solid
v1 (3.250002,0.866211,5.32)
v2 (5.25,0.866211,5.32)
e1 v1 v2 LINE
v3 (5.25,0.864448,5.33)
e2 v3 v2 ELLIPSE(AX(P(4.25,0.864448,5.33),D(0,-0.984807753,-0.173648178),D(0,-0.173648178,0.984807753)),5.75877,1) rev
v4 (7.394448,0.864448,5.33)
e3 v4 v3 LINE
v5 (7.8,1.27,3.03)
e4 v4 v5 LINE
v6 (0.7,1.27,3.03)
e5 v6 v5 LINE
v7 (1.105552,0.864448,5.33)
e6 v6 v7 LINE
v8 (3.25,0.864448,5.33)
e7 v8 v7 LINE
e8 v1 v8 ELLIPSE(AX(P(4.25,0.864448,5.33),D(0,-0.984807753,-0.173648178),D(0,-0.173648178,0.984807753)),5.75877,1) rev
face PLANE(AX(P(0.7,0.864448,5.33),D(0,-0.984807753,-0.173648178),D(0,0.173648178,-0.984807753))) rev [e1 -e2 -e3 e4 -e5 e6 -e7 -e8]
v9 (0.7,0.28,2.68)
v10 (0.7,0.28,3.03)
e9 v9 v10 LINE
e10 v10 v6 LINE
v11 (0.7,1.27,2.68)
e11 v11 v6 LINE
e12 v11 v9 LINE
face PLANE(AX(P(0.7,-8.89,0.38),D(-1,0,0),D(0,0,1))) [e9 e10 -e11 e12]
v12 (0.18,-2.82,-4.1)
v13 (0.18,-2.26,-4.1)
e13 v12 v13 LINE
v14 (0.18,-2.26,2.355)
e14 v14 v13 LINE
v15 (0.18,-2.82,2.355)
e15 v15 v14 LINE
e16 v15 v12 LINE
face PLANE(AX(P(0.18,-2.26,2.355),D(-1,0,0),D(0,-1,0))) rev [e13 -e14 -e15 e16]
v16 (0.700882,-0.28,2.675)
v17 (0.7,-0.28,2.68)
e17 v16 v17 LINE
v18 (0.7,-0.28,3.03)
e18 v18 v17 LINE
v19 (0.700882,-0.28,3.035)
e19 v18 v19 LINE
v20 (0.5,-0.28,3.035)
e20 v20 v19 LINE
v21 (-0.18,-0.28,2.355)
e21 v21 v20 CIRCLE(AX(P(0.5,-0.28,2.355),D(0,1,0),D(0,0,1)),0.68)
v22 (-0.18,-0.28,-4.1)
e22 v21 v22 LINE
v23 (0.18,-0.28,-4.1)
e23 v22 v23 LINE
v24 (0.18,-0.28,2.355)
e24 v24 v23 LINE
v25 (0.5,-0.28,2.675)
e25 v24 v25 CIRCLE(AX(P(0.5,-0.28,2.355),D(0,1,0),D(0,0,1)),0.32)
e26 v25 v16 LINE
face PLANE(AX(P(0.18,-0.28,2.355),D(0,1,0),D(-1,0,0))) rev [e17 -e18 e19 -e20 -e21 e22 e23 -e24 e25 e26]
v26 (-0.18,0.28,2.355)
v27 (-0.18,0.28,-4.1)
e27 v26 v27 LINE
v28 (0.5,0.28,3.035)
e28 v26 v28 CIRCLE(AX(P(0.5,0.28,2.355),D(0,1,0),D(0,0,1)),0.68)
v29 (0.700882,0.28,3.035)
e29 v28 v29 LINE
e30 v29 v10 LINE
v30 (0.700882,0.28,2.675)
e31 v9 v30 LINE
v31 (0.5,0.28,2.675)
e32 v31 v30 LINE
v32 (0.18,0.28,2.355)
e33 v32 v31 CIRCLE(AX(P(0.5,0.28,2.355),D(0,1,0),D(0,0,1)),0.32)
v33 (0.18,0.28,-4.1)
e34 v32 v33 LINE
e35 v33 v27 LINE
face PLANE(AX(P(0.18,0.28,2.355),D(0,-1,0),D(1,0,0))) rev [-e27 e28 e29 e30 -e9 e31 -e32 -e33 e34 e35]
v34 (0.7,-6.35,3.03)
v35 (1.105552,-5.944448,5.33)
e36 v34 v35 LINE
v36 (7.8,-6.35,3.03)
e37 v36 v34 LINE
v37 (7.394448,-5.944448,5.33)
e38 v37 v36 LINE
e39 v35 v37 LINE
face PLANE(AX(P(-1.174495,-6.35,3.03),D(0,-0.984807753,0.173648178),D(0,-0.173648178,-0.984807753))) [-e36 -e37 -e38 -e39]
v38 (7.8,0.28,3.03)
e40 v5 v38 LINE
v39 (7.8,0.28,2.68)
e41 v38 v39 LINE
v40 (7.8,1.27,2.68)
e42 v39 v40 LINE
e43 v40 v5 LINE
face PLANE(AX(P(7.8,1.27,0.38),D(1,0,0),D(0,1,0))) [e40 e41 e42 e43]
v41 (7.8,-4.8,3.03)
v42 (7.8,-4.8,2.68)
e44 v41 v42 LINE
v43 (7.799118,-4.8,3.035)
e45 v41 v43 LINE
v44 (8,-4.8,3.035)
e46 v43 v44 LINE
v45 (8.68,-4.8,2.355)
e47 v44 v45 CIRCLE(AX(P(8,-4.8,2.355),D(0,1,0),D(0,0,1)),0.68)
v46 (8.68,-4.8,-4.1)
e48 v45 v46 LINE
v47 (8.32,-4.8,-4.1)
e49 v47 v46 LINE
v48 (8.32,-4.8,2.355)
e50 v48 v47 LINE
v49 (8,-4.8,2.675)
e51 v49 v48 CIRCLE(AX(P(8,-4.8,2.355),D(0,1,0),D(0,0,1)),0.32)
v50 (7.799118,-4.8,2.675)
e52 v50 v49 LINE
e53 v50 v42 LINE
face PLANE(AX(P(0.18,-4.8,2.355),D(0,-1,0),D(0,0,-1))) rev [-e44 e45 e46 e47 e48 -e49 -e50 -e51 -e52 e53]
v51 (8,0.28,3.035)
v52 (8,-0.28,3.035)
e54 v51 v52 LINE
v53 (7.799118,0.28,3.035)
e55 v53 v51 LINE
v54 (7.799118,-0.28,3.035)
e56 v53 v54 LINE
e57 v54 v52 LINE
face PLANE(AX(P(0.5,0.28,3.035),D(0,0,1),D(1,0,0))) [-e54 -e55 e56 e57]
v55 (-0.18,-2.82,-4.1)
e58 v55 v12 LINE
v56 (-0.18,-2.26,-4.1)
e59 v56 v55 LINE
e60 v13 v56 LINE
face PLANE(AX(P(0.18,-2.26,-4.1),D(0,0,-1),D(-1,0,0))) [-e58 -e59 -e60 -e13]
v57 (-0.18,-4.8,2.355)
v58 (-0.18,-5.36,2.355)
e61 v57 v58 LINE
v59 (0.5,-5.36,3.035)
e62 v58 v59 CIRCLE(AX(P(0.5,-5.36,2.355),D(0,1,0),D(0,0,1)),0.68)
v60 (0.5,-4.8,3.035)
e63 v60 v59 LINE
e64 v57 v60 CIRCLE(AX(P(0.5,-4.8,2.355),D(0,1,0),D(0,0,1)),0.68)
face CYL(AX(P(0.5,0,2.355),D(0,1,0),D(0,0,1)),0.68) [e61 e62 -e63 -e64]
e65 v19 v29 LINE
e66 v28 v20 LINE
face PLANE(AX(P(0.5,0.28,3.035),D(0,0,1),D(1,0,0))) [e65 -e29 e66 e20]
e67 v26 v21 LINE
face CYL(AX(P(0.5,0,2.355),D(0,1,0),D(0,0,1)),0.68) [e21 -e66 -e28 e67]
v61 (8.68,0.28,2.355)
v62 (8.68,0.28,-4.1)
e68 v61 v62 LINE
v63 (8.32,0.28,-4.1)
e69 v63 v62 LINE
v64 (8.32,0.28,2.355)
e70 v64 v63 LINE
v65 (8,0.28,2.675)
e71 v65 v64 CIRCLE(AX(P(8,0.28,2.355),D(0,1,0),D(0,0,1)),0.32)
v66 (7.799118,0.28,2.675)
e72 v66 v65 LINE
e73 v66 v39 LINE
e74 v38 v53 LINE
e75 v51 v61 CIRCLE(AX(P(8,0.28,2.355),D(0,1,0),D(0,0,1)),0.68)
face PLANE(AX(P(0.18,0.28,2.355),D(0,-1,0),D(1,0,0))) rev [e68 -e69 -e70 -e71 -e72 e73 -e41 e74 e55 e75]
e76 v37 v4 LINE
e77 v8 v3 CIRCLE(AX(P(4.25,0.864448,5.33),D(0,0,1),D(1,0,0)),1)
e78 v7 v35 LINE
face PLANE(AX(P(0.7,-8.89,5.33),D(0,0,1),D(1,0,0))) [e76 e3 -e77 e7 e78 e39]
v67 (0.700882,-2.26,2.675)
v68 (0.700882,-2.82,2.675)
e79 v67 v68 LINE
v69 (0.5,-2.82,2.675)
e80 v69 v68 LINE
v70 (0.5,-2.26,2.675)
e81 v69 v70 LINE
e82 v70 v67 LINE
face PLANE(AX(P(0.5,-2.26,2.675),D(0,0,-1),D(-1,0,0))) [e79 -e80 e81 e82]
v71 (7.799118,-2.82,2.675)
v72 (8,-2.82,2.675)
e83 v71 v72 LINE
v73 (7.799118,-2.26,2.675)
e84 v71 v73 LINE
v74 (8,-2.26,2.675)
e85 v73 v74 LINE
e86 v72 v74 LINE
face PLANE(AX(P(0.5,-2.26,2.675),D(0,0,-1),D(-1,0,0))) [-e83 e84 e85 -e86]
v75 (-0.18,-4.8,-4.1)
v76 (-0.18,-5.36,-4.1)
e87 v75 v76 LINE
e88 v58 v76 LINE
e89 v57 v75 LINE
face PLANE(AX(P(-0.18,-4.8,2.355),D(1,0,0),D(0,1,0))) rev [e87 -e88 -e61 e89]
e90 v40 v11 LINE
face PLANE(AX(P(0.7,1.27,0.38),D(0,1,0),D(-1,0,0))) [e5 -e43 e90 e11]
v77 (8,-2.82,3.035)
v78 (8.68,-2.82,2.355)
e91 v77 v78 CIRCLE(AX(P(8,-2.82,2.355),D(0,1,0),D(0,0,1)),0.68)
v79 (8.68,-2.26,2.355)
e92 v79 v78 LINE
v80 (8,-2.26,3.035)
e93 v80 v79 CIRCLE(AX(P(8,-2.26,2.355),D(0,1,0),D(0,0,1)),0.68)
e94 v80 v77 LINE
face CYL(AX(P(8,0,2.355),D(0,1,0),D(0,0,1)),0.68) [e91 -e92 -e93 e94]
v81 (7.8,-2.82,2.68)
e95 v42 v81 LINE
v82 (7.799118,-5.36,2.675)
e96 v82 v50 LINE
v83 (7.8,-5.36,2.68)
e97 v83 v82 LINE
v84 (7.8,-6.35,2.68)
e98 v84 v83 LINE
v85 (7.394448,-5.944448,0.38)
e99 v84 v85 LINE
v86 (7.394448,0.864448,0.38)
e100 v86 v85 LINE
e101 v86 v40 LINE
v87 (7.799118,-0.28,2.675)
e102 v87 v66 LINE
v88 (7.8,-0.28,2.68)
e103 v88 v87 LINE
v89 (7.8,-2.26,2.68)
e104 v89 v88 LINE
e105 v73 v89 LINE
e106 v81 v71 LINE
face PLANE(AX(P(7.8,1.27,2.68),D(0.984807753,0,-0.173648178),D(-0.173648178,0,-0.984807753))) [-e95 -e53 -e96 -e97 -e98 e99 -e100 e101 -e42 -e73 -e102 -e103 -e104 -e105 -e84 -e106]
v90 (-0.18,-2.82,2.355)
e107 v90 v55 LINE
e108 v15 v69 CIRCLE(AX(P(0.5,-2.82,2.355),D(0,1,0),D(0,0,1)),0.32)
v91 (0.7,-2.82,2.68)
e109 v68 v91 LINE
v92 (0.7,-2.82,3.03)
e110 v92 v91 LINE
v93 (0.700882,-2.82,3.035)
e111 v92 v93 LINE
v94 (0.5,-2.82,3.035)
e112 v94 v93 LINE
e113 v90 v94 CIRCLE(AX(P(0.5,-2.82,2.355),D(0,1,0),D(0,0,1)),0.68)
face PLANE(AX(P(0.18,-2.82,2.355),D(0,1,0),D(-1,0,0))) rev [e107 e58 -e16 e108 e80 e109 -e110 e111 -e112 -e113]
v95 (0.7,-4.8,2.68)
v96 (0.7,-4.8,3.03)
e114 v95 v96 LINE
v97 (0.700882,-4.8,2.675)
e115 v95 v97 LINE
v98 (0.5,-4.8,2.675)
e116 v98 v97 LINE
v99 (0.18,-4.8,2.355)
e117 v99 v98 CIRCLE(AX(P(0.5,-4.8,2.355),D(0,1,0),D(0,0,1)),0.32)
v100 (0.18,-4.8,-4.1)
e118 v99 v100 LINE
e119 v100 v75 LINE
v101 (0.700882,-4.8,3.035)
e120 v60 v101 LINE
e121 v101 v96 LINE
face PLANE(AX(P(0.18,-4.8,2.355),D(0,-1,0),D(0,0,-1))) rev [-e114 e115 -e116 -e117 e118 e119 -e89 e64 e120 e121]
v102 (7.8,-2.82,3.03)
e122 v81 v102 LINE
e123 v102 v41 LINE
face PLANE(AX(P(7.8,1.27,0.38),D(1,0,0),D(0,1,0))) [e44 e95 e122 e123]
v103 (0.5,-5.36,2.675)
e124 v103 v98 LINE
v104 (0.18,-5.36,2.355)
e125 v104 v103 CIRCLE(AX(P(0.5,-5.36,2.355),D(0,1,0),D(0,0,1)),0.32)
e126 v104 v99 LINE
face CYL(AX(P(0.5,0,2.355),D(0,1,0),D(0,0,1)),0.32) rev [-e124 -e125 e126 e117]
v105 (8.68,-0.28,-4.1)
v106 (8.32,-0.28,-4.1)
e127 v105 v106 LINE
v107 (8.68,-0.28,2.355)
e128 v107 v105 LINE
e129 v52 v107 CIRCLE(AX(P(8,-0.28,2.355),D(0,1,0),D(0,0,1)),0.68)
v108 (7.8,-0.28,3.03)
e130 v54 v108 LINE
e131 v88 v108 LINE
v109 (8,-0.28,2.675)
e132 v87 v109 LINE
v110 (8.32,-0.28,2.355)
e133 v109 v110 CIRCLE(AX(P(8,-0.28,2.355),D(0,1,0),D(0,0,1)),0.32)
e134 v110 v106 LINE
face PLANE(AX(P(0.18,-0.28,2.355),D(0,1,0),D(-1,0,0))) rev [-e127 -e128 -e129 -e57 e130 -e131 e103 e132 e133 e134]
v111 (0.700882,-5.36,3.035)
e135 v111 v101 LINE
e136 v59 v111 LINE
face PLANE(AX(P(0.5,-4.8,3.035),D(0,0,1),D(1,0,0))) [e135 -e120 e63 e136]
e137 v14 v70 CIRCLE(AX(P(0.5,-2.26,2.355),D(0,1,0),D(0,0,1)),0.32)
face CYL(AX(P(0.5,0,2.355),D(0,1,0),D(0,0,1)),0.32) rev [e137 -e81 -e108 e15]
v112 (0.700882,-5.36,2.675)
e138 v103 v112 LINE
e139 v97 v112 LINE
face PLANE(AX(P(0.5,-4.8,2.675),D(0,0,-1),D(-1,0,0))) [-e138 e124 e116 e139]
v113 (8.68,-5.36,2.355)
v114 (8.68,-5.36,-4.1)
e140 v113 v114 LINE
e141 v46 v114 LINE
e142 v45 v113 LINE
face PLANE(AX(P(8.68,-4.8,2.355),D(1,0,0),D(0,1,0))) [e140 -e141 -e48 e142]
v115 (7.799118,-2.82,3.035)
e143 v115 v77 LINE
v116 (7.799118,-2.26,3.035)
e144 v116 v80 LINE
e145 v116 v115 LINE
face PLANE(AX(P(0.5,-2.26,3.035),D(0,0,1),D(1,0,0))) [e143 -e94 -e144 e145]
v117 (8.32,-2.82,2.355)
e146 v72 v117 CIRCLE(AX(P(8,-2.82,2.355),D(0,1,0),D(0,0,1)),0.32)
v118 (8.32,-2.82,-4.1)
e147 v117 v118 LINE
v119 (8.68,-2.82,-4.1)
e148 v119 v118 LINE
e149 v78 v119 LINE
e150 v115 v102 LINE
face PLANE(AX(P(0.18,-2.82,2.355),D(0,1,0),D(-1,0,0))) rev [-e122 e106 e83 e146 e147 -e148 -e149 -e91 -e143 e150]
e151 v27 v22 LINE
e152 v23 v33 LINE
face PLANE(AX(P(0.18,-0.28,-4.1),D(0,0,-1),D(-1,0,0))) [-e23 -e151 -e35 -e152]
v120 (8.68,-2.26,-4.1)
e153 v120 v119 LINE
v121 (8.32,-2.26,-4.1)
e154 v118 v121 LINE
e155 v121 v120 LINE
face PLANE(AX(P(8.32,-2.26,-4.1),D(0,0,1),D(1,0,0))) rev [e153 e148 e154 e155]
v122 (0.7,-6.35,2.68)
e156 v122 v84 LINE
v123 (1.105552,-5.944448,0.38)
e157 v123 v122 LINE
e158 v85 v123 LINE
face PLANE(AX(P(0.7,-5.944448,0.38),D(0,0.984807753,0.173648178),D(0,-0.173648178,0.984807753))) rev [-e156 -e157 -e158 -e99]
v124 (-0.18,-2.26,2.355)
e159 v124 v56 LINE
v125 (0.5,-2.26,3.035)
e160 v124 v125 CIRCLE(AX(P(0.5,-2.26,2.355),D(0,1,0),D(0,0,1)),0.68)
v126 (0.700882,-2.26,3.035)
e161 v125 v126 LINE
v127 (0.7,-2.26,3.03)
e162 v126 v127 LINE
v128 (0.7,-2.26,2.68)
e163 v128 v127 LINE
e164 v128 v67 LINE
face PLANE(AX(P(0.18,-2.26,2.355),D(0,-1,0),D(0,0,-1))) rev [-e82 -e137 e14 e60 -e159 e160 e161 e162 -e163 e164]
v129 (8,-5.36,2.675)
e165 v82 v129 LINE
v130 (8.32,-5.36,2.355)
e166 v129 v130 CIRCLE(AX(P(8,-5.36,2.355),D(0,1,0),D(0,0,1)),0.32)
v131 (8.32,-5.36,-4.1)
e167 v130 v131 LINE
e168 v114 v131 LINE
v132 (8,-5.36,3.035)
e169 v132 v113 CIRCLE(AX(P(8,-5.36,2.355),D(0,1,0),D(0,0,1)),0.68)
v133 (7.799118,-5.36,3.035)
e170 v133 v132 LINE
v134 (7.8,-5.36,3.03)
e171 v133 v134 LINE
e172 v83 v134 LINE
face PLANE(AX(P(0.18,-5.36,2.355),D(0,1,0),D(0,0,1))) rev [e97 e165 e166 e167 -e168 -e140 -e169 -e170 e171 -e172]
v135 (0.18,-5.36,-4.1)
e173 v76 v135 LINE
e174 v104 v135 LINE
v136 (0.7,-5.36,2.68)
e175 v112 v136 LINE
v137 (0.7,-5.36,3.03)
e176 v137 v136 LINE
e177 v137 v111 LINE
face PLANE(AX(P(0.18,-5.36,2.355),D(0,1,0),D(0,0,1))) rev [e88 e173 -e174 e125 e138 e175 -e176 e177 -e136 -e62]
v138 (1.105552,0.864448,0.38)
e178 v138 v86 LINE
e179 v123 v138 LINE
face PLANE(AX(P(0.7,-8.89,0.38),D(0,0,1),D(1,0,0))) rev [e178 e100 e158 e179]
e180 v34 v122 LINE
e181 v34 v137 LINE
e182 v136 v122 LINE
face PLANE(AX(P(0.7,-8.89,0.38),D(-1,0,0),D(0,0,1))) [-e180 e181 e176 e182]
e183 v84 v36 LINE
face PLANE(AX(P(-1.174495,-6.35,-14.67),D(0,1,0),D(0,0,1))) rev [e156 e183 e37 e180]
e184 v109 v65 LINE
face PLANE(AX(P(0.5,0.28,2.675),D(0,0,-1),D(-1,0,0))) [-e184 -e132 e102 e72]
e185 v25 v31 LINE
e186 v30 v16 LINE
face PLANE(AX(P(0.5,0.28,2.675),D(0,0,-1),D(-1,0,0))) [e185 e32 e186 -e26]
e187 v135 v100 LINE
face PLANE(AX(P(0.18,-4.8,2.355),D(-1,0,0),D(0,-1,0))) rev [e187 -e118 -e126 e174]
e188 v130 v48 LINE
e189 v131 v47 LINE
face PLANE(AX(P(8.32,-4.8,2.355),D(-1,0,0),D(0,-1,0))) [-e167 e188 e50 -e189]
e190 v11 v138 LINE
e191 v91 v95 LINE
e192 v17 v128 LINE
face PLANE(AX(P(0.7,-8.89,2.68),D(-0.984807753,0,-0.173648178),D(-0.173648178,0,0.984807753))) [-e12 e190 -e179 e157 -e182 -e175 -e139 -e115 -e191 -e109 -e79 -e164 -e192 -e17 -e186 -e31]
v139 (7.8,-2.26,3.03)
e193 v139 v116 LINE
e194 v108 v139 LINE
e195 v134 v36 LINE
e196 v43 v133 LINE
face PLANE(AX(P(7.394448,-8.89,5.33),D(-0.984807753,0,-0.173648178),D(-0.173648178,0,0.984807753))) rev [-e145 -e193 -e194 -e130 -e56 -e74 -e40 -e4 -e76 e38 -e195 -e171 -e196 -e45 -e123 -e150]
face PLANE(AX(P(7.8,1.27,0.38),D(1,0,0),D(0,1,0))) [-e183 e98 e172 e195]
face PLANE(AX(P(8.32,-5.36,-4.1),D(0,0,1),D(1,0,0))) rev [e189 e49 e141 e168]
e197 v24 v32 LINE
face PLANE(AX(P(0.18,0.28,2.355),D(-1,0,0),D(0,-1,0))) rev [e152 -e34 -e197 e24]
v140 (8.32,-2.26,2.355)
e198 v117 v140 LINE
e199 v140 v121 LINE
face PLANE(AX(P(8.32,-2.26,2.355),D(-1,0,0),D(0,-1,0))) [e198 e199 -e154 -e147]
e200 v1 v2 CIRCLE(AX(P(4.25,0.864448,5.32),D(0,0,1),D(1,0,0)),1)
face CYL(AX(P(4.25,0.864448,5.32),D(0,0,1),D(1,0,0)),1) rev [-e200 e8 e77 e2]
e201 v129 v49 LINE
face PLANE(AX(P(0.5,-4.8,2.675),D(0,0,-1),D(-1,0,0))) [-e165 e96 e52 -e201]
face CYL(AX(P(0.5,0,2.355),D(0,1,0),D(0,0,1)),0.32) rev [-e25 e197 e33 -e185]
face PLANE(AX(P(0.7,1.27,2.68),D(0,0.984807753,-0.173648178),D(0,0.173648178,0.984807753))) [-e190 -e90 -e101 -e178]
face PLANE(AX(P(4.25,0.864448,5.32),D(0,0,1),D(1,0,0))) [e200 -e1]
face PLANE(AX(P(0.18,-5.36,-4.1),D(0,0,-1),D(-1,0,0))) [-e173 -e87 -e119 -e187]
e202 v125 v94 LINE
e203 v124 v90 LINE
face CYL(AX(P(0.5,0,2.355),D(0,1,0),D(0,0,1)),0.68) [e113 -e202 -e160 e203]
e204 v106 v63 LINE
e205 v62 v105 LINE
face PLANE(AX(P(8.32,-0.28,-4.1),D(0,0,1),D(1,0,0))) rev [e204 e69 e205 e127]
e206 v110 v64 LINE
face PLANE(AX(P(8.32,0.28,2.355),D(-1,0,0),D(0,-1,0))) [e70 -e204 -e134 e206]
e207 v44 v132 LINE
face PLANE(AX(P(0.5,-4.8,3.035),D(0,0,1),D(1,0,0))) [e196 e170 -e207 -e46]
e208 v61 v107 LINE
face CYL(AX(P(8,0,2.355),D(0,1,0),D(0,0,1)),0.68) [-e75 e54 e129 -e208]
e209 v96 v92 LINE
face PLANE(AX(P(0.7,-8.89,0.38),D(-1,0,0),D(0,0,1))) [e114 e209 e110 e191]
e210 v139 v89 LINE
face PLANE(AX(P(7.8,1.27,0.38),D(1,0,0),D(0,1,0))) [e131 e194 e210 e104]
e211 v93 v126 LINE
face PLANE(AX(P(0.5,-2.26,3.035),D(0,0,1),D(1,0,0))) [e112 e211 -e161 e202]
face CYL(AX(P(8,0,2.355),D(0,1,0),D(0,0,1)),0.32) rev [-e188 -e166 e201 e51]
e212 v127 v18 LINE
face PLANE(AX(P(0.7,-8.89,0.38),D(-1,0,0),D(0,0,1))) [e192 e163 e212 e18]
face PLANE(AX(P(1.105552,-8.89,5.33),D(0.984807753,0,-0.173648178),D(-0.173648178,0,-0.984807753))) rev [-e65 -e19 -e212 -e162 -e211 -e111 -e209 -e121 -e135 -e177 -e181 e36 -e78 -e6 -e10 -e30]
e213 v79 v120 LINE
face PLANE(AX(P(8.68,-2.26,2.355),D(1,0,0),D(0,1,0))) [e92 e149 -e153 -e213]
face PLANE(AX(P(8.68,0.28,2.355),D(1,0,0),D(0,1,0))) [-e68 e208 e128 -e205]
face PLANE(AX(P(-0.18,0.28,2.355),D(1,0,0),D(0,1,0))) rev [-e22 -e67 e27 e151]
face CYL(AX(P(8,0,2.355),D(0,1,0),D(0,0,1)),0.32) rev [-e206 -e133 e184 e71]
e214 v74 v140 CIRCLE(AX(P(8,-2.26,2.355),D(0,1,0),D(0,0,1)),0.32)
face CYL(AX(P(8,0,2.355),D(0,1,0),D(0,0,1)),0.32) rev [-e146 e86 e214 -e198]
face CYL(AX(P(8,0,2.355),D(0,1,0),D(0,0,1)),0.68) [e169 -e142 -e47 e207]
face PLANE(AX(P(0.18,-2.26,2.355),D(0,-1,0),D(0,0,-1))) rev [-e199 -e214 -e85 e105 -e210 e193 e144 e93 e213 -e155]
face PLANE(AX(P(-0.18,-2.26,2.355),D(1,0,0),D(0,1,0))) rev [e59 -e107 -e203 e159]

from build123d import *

# Parameters (mm, degrees)
EXTRUDE_1_DEPTH     = 4.95
SKETCH_5_W          = 0.36
SKETCH_5_H          = 0.56
SKETCH_5_2_W        = 0.36
SKETCH_5_2_H        = 0.56
EXTRUDE_2_DEPTH     = 4.1
CHAMFER_1_SIZE      = 2.3
CHAMFER_1_SIZE_2    = 0.405552056
SKETCH_6_R          = 1
CUT_EXTRUDE_1_DEPTH = 0.01
SKETCH_7_W          = 10.556189846
SKETCH_7_H          = 3.652287582
CUT_EXTRUDE_2_DEPTH = 20
CHAMFER_2_SIZE      = 2.3
CHAMFER_2_SIZE2     = 0.405552056


with BuildPart() as part:
    # Эскиз3 → Вытянуть1 (new body)
    with BuildSketch(Plane.XY.offset(5.33)):
        Polygon((0.7, 1.27), (4.25, 1.27), (7.8, 1.27), (7.8, -8.89), (0.7, -8.89), align=None)
    extrude(amount=-EXTRUDE_1_DEPTH)

    # По траектории1: sweep along a path in Эскиз4
    with BuildLine(Plane(origin=(0, 0, 0), x_dir=(1, 0, 0), z_dir=(0, 1, 0))) as sweep_1_path:
        Line((0, 0), (0, -2.355))
        ThreePointArc((0, -2.355), (0.146446609, -2.708553391), (0.5, -2.855))
        Line((0.5, -2.855), (0.7, -2.855))
        Line((0.7, -2.855), (7.8, -2.855))
        Line((7.8, -2.855), (8, -2.855))
        ThreePointArc((8, -2.855), (8.353553391, -2.708553391), (8.5, -2.355))
        Line((8.5, -2.355), (8.5, 0))
        Line((8.5, 0), (8.5, 4.1))
    # Эскиз5 → По траектории1 (sweep)
    with BuildSketch(Plane.XY):
        with Locations((0, -2.54)):
            Rectangle(SKETCH_5_W, SKETCH_5_H)
        Rectangle(SKETCH_5_W, SKETCH_5_H)
        with Locations((0, -5.08)):
            Rectangle(SKETCH_5_W, SKETCH_5_H)
        with Locations((0, -7.62)):
            Rectangle(SKETCH_5_W, SKETCH_5_H)
    sweep(path=sweep_1_path.line)

    # Эскиз5<2> → Вытянуть2 (add)
    with BuildSketch(Plane.XY):
        with Locations((0, -2.54)):
            Rectangle(SKETCH_5_2_W, SKETCH_5_2_H)
        Rectangle(SKETCH_5_2_W, SKETCH_5_2_H)
        with Locations((0, -5.08)):
            Rectangle(SKETCH_5_2_W, SKETCH_5_2_H)
        with Locations((0, -7.62)):
            Rectangle(SKETCH_5_2_W, SKETCH_5_2_H)
    extrude(amount=-EXTRUDE_2_DEPTH)

    # Фаска1
    # the kernel refuses this chamfer: 2.3, 0.405552056 mm, written as the material it takes off along each edge
    with BuildSketch(Plane(origin=(13.776639232, -8.89, 0.38), x_dir=(0, -0.006682531656101655, 0.9999776716360548), z_dir=(-1, 0, 0))) as chamfer_1_piece_1:
        Polygon((CHAMFER_1_SIZE * 0.999977671636, CHAMFER_1_SIZE * 0.0066825316561), (-CHAMFER_1_SIZE_2 * 0.00668253165, CHAMFER_1_SIZE_2 * 0.999977670722), (0, 0), align=None)
    extrude(amount=19.053278464, mode=Mode.SUBTRACT)
    with BuildSketch(Plane(origin=(13.776639232, -8.89, 5.33), x_dir=(4.402885138150507e-15, 0.9776715712462588, 0.2101387607674306), z_dir=(-1, 0, 0))) as chamfer_1_piece_2:
        Polygon((CHAMFER_1_SIZE_2 * 0.977671570353, CHAMFER_1_SIZE_2 * 0.210138760575), (-CHAMFER_1_SIZE * 0.210138760767, CHAMFER_1_SIZE * 0.977671571246), (0, 0), align=None)
    extrude(amount=19.053278464, mode=Mode.SUBTRACT)
    with BuildSketch(Plane(origin=(7.8, 7.246639232, 0.38), x_dir=(0.006682531656101655, 0, 0.9999776716360548), z_dir=(0, -1, 0))) as chamfer_1_piece_3_section:
        Polygon((CHAMFER_1_SIZE * 0.999977671636, CHAMFER_1_SIZE * 0.0066825316561), (-CHAMFER_1_SIZE_2 * 0.00668253165, CHAMFER_1_SIZE_2 * 0.999977670722), (0, 0), align=None)
    chamfer_1_piece_3 = extrude(amount=22.113278464, mode=Mode.PRIVATE)
    chamfer_1_piece_3 = split(chamfer_1_piece_3, bisect_by=Plane(origin=(7.799706122, 0.28, 2.676666667), z_dir=(0, 1, 0)), keep=Keep.TOP, mode=Mode.PRIVATE)
    add(chamfer_1_piece_3, mode=Mode.SUBTRACT)
    with BuildSketch(Plane(origin=(7.8, 7.246639232, 0.38), x_dir=(0.006682531656101655, 0, 0.9999776716360548), z_dir=(0, -1, 0))) as chamfer_1_piece_4_section:
        Polygon((CHAMFER_1_SIZE * 0.999977671636, CHAMFER_1_SIZE * 0.0066825316561), (-CHAMFER_1_SIZE_2 * 0.00668253165, CHAMFER_1_SIZE_2 * 0.999977670722), (0, 0), align=None)
    chamfer_1_piece_4 = extrude(amount=22.113278464, mode=Mode.PRIVATE)
    chamfer_1_piece_4 = split(chamfer_1_piece_4, bisect_by=Plane(origin=(7.664815344, 0, 2.675), z_dir=(0, 0, -1)), keep=Keep.TOP, mode=Mode.PRIVATE)
    add(chamfer_1_piece_4, mode=Mode.SUBTRACT)
    with BuildSketch(Plane(origin=(7.8, 7.246639232, 0.38), x_dir=(0.006682531656101655, 0, 0.9999776716360548), z_dir=(0, -1, 0))) as chamfer_1_piece_5_section:
        Polygon((CHAMFER_1_SIZE * 0.999977671636, CHAMFER_1_SIZE * 0.0066825316561), (-CHAMFER_1_SIZE_2 * 0.00668253165, CHAMFER_1_SIZE_2 * 0.999977670722), (0, 0), align=None)
    chamfer_1_piece_5 = extrude(amount=22.113278464, mode=Mode.PRIVATE)
    chamfer_1_piece_5 = split(chamfer_1_piece_5, bisect_by=Plane(origin=(7.799706122, -2.26, 2.676666667), z_dir=(0, 1, 0)), keep=Keep.TOP, mode=Mode.PRIVATE)
    chamfer_1_piece_5 = split(chamfer_1_piece_5, bisect_by=Plane(origin=(7.799706122, -0.28, 2.676666667), z_dir=(0, -1, 0)), keep=Keep.TOP, mode=Mode.PRIVATE)
    add(chamfer_1_piece_5, mode=Mode.SUBTRACT)
    with BuildSketch(Plane(origin=(7.8, 7.246639232, 0.38), x_dir=(0.006682531656101655, 0, 0.9999776716360548), z_dir=(0, -1, 0))) as chamfer_1_piece_6_section:
        Polygon((CHAMFER_1_SIZE * 0.999977671636, CHAMFER_1_SIZE * 0.0066825316561), (-CHAMFER_1_SIZE_2 * 0.00668253165, CHAMFER_1_SIZE_2 * 0.999977670722), (0, 0), align=None)
    chamfer_1_piece_6 = extrude(amount=22.113278464, mode=Mode.PRIVATE)
    chamfer_1_piece_6 = split(chamfer_1_piece_6, bisect_by=Plane(origin=(7.799706122, -2.82, 2.676666667), z_dir=(0, -1, 0)), keep=Keep.TOP, mode=Mode.PRIVATE)
    chamfer_1_piece_6 = split(chamfer_1_piece_6, bisect_by=Plane(origin=(7.799706122, -4.8, 2.676666667), z_dir=(0, 1, 0)), keep=Keep.TOP, mode=Mode.PRIVATE)
    add(chamfer_1_piece_6, mode=Mode.SUBTRACT)
    with BuildSketch(Plane(origin=(7.8, 7.246639232, 0.38), x_dir=(0.006682531656101655, 0, 0.9999776716360548), z_dir=(0, -1, 0))) as chamfer_1_piece_7_section:
        Polygon((CHAMFER_1_SIZE * 0.999977671636, CHAMFER_1_SIZE * 0.0066825316561), (-CHAMFER_1_SIZE_2 * 0.00668253165, CHAMFER_1_SIZE_2 * 0.999977670722), (0, 0), align=None)
    chamfer_1_piece_7 = extrude(amount=22.113278464, mode=Mode.PRIVATE)
    chamfer_1_piece_7 = split(chamfer_1_piece_7, bisect_by=Plane(origin=(7.799706122, -7.34, 2.676666667), z_dir=(0, 1, 0)), keep=Keep.TOP, mode=Mode.PRIVATE)
    chamfer_1_piece_7 = split(chamfer_1_piece_7, bisect_by=Plane(origin=(7.799706122, -5.36, 2.676666667), z_dir=(0, -1, 0)), keep=Keep.TOP, mode=Mode.PRIVATE)
    add(chamfer_1_piece_7, mode=Mode.SUBTRACT)
    with BuildSketch(Plane(origin=(7.8, 7.246639232, 0.38), x_dir=(0.006682531656101655, 0, 0.9999776716360548), z_dir=(0, -1, 0))) as chamfer_1_piece_8_section:
        Polygon((CHAMFER_1_SIZE * 0.999977671636, CHAMFER_1_SIZE * 0.0066825316561), (-CHAMFER_1_SIZE_2 * 0.00668253165, CHAMFER_1_SIZE_2 * 0.999977670722), (0, 0), align=None)
    chamfer_1_piece_8 = extrude(amount=22.113278464, mode=Mode.PRIVATE)
    chamfer_1_piece_8 = split(chamfer_1_piece_8, bisect_by=Plane(origin=(7.799706122, -7.9, 2.676666667), z_dir=(0, -1, 0)), keep=Keep.TOP, mode=Mode.PRIVATE)
    add(chamfer_1_piece_8, mode=Mode.SUBTRACT)
    with BuildSketch(Plane(origin=(7.8, 7.246639232, 5.33), x_dir=(-0.9776715712462587, -1.3674752616302956e-15, 0.21013876076743102), z_dir=(0, -1, 0))) as chamfer_1_piece_9_section:
        Polygon((CHAMFER_1_SIZE_2 * 0.977671570353, CHAMFER_1_SIZE_2 * 0.210138760575), (-CHAMFER_1_SIZE * 0.210138760767, CHAMFER_1_SIZE * 0.977671571246), (0, 0), align=None)
    chamfer_1_piece_9 = extrude(amount=22.113278464, mode=Mode.PRIVATE)
    chamfer_1_piece_9 = split(chamfer_1_piece_9, bisect_by=Plane(origin=(7.664815344, 0.775, 3.035), z_dir=(0, 0, 1)), keep=Keep.TOP, mode=Mode.PRIVATE)
    add(chamfer_1_piece_9, mode=Mode.SUBTRACT)
    with BuildSketch(Plane(origin=(7.8, 7.246639232, 5.33), x_dir=(-0.9776715712462587, -1.3674752616302956e-15, 0.21013876076743102), z_dir=(0, -1, 0))) as chamfer_1_piece_10_section:
        Polygon((CHAMFER_1_SIZE_2 * 0.977671570353, CHAMFER_1_SIZE_2 * 0.210138760575), (-CHAMFER_1_SIZE * 0.210138760767, CHAMFER_1_SIZE * 0.977671571246), (0, 0), align=None)
    chamfer_1_piece_10 = extrude(amount=22.113278464, mode=Mode.PRIVATE)
    chamfer_1_piece_10 = split(chamfer_1_piece_10, bisect_by=Plane(origin=(7.799706122, 0.28, 3.033333333), z_dir=(0, 1, 0)), keep=Keep.TOP, mode=Mode.PRIVATE)
    add(chamfer_1_piece_10, mode=Mode.SUBTRACT)
    with BuildSketch(Plane(origin=(7.8, 7.246639232, 5.33), x_dir=(-0.9776715712462587, -1.3674752616302956e-15, 0.21013876076743102), z_dir=(0, -1, 0))) as chamfer_1_piece_11_section:
        Polygon((CHAMFER_1_SIZE_2 * 0.977671570353, CHAMFER_1_SIZE_2 * 0.210138760575), (-CHAMFER_1_SIZE * 0.210138760767, CHAMFER_1_SIZE * 0.977671571246), (0, 0), align=None)
    chamfer_1_piece_11 = extrude(amount=22.113278464, mode=Mode.PRIVATE)
    chamfer_1_piece_11 = split(chamfer_1_piece_11, bisect_by=Plane(origin=(7.799706122, -2.26, 3.033333333), z_dir=(0, 1, 0)), keep=Keep.TOP, mode=Mode.PRIVATE)
    chamfer_1_piece_11 = split(chamfer_1_piece_11, bisect_by=Plane(origin=(7.799706122, -0.28, 3.033333333), z_dir=(0, -1, 0)), keep=Keep.TOP, mode=Mode.PRIVATE)
    add(chamfer_1_piece_11, mode=Mode.SUBTRACT)
    with BuildSketch(Plane(origin=(7.8, 7.246639232, 5.33), x_dir=(-0.9776715712462587, -1.3674752616302956e-15, 0.21013876076743102), z_dir=(0, -1, 0))) as chamfer_1_piece_12_section:
        Polygon((CHAMFER_1_SIZE_2 * 0.977671570353, CHAMFER_1_SIZE_2 * 0.210138760575), (-CHAMFER_1_SIZE * 0.210138760767, CHAMFER_1_SIZE * 0.977671571246), (0, 0), align=None)
    chamfer_1_piece_12 = extrude(amount=22.113278464, mode=Mode.PRIVATE)
    chamfer_1_piece_12 = split(chamfer_1_piece_12, bisect_by=Plane(origin=(7.799706122, -2.82, 3.033333333), z_dir=(0, -1, 0)), keep=Keep.TOP, mode=Mode.PRIVATE)
    chamfer_1_piece_12 = split(chamfer_1_piece_12, bisect_by=Plane(origin=(7.799706122, -4.8, 3.033333333), z_dir=(0, 1, 0)), keep=Keep.TOP, mode=Mode.PRIVATE)
    add(chamfer_1_piece_12, mode=Mode.SUBTRACT)
    with BuildSketch(Plane(origin=(7.8, 7.246639232, 5.33), x_dir=(-0.9776715712462587, -1.3674752616302956e-15, 0.21013876076743102), z_dir=(0, -1, 0))) as chamfer_1_piece_13_section:
        Polygon((CHAMFER_1_SIZE_2 * 0.977671570353, CHAMFER_1_SIZE_2 * 0.210138760575), (-CHAMFER_1_SIZE * 0.210138760767, CHAMFER_1_SIZE * 0.977671571246), (0, 0), align=None)
    chamfer_1_piece_13 = extrude(amount=22.113278464, mode=Mode.PRIVATE)
    chamfer_1_piece_13 = split(chamfer_1_piece_13, bisect_by=Plane(origin=(7.799706122, -7.34, 3.033333333), z_dir=(0, 1, 0)), keep=Keep.TOP, mode=Mode.PRIVATE)
    chamfer_1_piece_13 = split(chamfer_1_piece_13, bisect_by=Plane(origin=(7.799706122, -5.36, 3.033333333), z_dir=(0, -1, 0)), keep=Keep.TOP, mode=Mode.PRIVATE)
    add(chamfer_1_piece_13, mode=Mode.SUBTRACT)
    with BuildSketch(Plane(origin=(7.8, 7.246639232, 5.33), x_dir=(-0.9776715712462587, -1.3674752616302956e-15, 0.21013876076743102), z_dir=(0, -1, 0))) as chamfer_1_piece_14_section:
        Polygon((CHAMFER_1_SIZE_2 * 0.977671570353, CHAMFER_1_SIZE_2 * 0.210138760575), (-CHAMFER_1_SIZE * 0.210138760767, CHAMFER_1_SIZE * 0.977671571246), (0, 0), align=None)
    chamfer_1_piece_14 = extrude(amount=22.113278464, mode=Mode.PRIVATE)
    chamfer_1_piece_14 = split(chamfer_1_piece_14, bisect_by=Plane(origin=(7.799706122, -7.9, 3.033333333), z_dir=(0, -1, 0)), keep=Keep.TOP, mode=Mode.PRIVATE)
    add(chamfer_1_piece_14, mode=Mode.SUBTRACT)
    with BuildSketch(Plane(origin=(13.776639232, 1.27, 0.38), x_dir=(0, 0.006682531656101748, 0.9999776716360548), z_dir=(-1, 0, 0)), Plane(origin=(-5.276639232, 1.27, 5.33), x_dir=(0, 0.006682531656101748, -0.9999776716360548), z_dir=(1, 0, 0))) as chamfer_1_piece_15:
        Polygon((CHAMFER_1_SIZE * 0.999977671636, -CHAMFER_1_SIZE * 0.0066825316561), (-CHAMFER_1_SIZE_2 * 0.00668253165, -CHAMFER_1_SIZE_2 * 0.999977670722), (0, 0), align=None)
    extrude(amount=19.053278464, mode=Mode.SUBTRACT)
    with BuildSketch(Plane(origin=(0.7, -14.866639232, 0.38), x_dir=(0.9776715712462587, 0, -0.2101387607674313), z_dir=(0, 1, 0))) as chamfer_1_piece_16_section:
        Polygon((CHAMFER_1_SIZE_2 * 0.977671570353, -CHAMFER_1_SIZE_2 * 0.210138760575), (-CHAMFER_1_SIZE * 0.210138760767, -CHAMFER_1_SIZE * 0.977671571246), (0, 0), align=None)
    chamfer_1_piece_16 = extrude(amount=22.113278464, mode=Mode.PRIVATE)
    chamfer_1_piece_16 = split(chamfer_1_piece_16, bisect_by=Plane(origin=(0.835184656, -8.395, 2.675), z_dir=(0, 0, -1)), keep=Keep.TOP, mode=Mode.PRIVATE)
    add(chamfer_1_piece_16, mode=Mode.SUBTRACT)
    with BuildSketch(Plane(origin=(0.7, -14.866639232, 0.38), x_dir=(0.9776715712462587, 0, -0.2101387607674313), z_dir=(0, 1, 0))) as chamfer_1_piece_17_section:
        Polygon((CHAMFER_1_SIZE_2 * 0.977671570353, -CHAMFER_1_SIZE_2 * 0.210138760575), (-CHAMFER_1_SIZE * 0.210138760767, -CHAMFER_1_SIZE * 0.977671571246), (0, 0), align=None)
    chamfer_1_piece_17 = extrude(amount=22.113278464, mode=Mode.PRIVATE)
    chamfer_1_piece_17 = split(chamfer_1_piece_17, bisect_by=Plane(origin=(0.700293878, -7.9, 2.676666667), z_dir=(0, -1, 0)), keep=Keep.TOP, mode=Mode.PRIVATE)
    add(chamfer_1_piece_17, mode=Mode.SUBTRACT)
    with BuildSketch(Plane(origin=(0.7, -14.866639232, 0.38), x_dir=(0.9776715712462587, 0, -0.2101387607674313), z_dir=(0, 1, 0))) as chamfer_1_piece_18_section:
        Polygon((CHAMFER_1_SIZE_2 * 0.977671570353, -CHAMFER_1_SIZE_2 * 0.210138760575), (-CHAMFER_1_SIZE * 0.210138760767, -CHAMFER_1_SIZE * 0.977671571246), (0, 0), align=None)
    chamfer_1_piece_18 = extrude(amount=22.113278464, mode=Mode.PRIVATE)
    chamfer_1_piece_18 = split(chamfer_1_piece_18, bisect_by=Plane(origin=(0.700293878, -5.36, 2.676666667), z_dir=(0, -1, 0)), keep=Keep.TOP, mode=Mode.PRIVATE)
    chamfer_1_piece_18 = split(chamfer_1_piece_18, bisect_by=Plane(origin=(0.700293878, -7.34, 2.676666667), z_dir=(0, 1, 0)), keep=Keep.TOP, mode=Mode.PRIVATE)
    add(chamfer_1_piece_18, mode=Mode.SUBTRACT)
    with BuildSketch(Plane(origin=(0.7, -14.866639232, 0.38), x_dir=(0.9776715712462587, 0, -0.2101387607674313), z_dir=(0, 1, 0))) as chamfer_1_piece_19_section:
        Polygon((CHAMFER_1_SIZE_2 * 0.977671570353, -CHAMFER_1_SIZE_2 * 0.210138760575), (-CHAMFER_1_SIZE * 0.210138760767, -CHAMFER_1_SIZE * 0.977671571246), (0, 0), align=None)
    chamfer_1_piece_19 = extrude(amount=22.113278464, mode=Mode.PRIVATE)
    chamfer_1_piece_19 = split(chamfer_1_piece_19, bisect_by=Plane(origin=(0.700293878, -2.82, 2.676666667), z_dir=(0, -1, 0)), keep=Keep.TOP, mode=Mode.PRIVATE)
    chamfer_1_piece_19 = split(chamfer_1_piece_19, bisect_by=Plane(origin=(0.700293878, -4.8, 2.676666667), z_dir=(0, 1, 0)), keep=Keep.TOP, mode=Mode.PRIVATE)
    add(chamfer_1_piece_19, mode=Mode.SUBTRACT)
    with BuildSketch(Plane(origin=(0.7, -14.866639232, 0.38), x_dir=(0.9776715712462587, 0, -0.2101387607674313), z_dir=(0, 1, 0))) as chamfer_1_piece_20_section:
        Polygon((CHAMFER_1_SIZE_2 * 0.977671570353, -CHAMFER_1_SIZE_2 * 0.210138760575), (-CHAMFER_1_SIZE * 0.210138760767, -CHAMFER_1_SIZE * 0.977671571246), (0, 0), align=None)
    chamfer_1_piece_20 = extrude(amount=22.113278464, mode=Mode.PRIVATE)
    chamfer_1_piece_20 = split(chamfer_1_piece_20, bisect_by=Plane(origin=(0.700293878, -0.28, 2.676666667), z_dir=(0, -1, 0)), keep=Keep.TOP, mode=Mode.PRIVATE)
    chamfer_1_piece_20 = split(chamfer_1_piece_20, bisect_by=Plane(origin=(0.700293878, -2.26, 2.676666667), z_dir=(0, 1, 0)), keep=Keep.TOP, mode=Mode.PRIVATE)
    add(chamfer_1_piece_20, mode=Mode.SUBTRACT)
    with BuildSketch(Plane(origin=(0.7, -14.866639232, 0.38), x_dir=(0.9776715712462587, 0, -0.2101387607674313), z_dir=(0, 1, 0))) as chamfer_1_piece_21_section:
        Polygon((CHAMFER_1_SIZE_2 * 0.977671570353, -CHAMFER_1_SIZE_2 * 0.210138760575), (-CHAMFER_1_SIZE * 0.210138760767, -CHAMFER_1_SIZE * 0.977671571246), (0, 0), align=None)
    chamfer_1_piece_21 = extrude(amount=22.113278464, mode=Mode.PRIVATE)
    chamfer_1_piece_21 = split(chamfer_1_piece_21, bisect_by=Plane(origin=(0.700293878, 0.28, 2.676666667), z_dir=(0, 1, 0)), keep=Keep.TOP, mode=Mode.PRIVATE)
    add(chamfer_1_piece_21, mode=Mode.SUBTRACT)
    with BuildSketch(Plane(origin=(0.7, -14.866639232, 5.33), x_dir=(0.9776715712462587, 0, 0.2101387607674309), z_dir=(0, 1, 0))) as chamfer_1_piece_22_section:
        Polygon((CHAMFER_1_SIZE_2 * 0.977671570353, CHAMFER_1_SIZE_2 * 0.210138760575), (-CHAMFER_1_SIZE * 0.210138760767, CHAMFER_1_SIZE * 0.977671571246), (0, 0), align=None)
    chamfer_1_piece_22 = extrude(amount=22.113278464, mode=Mode.PRIVATE)
    chamfer_1_piece_22 = split(chamfer_1_piece_22, bisect_by=Plane(origin=(0.835184656, -8.395, 3.035), z_dir=(0, 0, 1)), keep=Keep.TOP, mode=Mode.PRIVATE)
    add(chamfer_1_piece_22, mode=Mode.SUBTRACT)
    with BuildSketch(Plane(origin=(0.7, -14.866639232, 5.33), x_dir=(0.9776715712462587, 0, 0.2101387607674309), z_dir=(0, 1, 0))) as chamfer_1_piece_23_section:
        Polygon((CHAMFER_1_SIZE_2 * 0.977671570353, CHAMFER_1_SIZE_2 * 0.210138760575), (-CHAMFER_1_SIZE * 0.210138760767, CHAMFER_1_SIZE * 0.977671571246), (0, 0), align=None)
    chamfer_1_piece_23 = extrude(amount=22.113278464, mode=Mode.PRIVATE)
    chamfer_1_piece_23 = split(chamfer_1_piece_23, bisect_by=Plane(origin=(0.700293878, -7.9, 3.033333333), z_dir=(0, -1, 0)), keep=Keep.TOP, mode=Mode.PRIVATE)
    add(chamfer_1_piece_23, mode=Mode.SUBTRACT)
    with BuildSketch(Plane(origin=(0.7, -14.866639232, 5.33), x_dir=(0.9776715712462587, 0, 0.2101387607674309), z_dir=(0, 1, 0))) as chamfer_1_piece_24_section:
        Polygon((CHAMFER_1_SIZE_2 * 0.977671570353, CHAMFER_1_SIZE_2 * 0.210138760575), (-CHAMFER_1_SIZE * 0.210138760767, CHAMFER_1_SIZE * 0.977671571246), (0, 0), align=None)
    chamfer_1_piece_24 = extrude(amount=22.113278464, mode=Mode.PRIVATE)
    chamfer_1_piece_24 = split(chamfer_1_piece_24, bisect_by=Plane(origin=(0.700293878, -5.36, 3.033333333), z_dir=(0, -1, 0)), keep=Keep.TOP, mode=Mode.PRIVATE)
    chamfer_1_piece_24 = split(chamfer_1_piece_24, bisect_by=Plane(origin=(0.700293878, -7.34, 3.033333333), z_dir=(0, 1, 0)), keep=Keep.TOP, mode=Mode.PRIVATE)
    add(chamfer_1_piece_24, mode=Mode.SUBTRACT)
    with BuildSketch(Plane(origin=(0.7, -14.866639232, 5.33), x_dir=(0.9776715712462587, 0, 0.2101387607674309), z_dir=(0, 1, 0))) as chamfer_1_piece_25_section:
        Polygon((CHAMFER_1_SIZE_2 * 0.977671570353, CHAMFER_1_SIZE_2 * 0.210138760575), (-CHAMFER_1_SIZE * 0.210138760767, CHAMFER_1_SIZE * 0.977671571246), (0, 0), align=None)
    chamfer_1_piece_25 = extrude(amount=22.113278464, mode=Mode.PRIVATE)
    chamfer_1_piece_25 = split(chamfer_1_piece_25, bisect_by=Plane(origin=(0.700293878, -2.82, 3.033333333), z_dir=(0, -1, 0)), keep=Keep.TOP, mode=Mode.PRIVATE)
    chamfer_1_piece_25 = split(chamfer_1_piece_25, bisect_by=Plane(origin=(0.700293878, -4.8, 3.033333333), z_dir=(0, 1, 0)), keep=Keep.TOP, mode=Mode.PRIVATE)
    add(chamfer_1_piece_25, mode=Mode.SUBTRACT)
    with BuildSketch(Plane(origin=(0.7, -14.866639232, 5.33), x_dir=(0.9776715712462587, 0, 0.2101387607674309), z_dir=(0, 1, 0))) as chamfer_1_piece_26_section:
        Polygon((CHAMFER_1_SIZE_2 * 0.977671570353, CHAMFER_1_SIZE_2 * 0.210138760575), (-CHAMFER_1_SIZE * 0.210138760767, CHAMFER_1_SIZE * 0.977671571246), (0, 0), align=None)
    chamfer_1_piece_26 = extrude(amount=22.113278464, mode=Mode.PRIVATE)
    chamfer_1_piece_26 = split(chamfer_1_piece_26, bisect_by=Plane(origin=(0.700293878, -0.28, 3.033333333), z_dir=(0, -1, 0)), keep=Keep.TOP, mode=Mode.PRIVATE)
    chamfer_1_piece_26 = split(chamfer_1_piece_26, bisect_by=Plane(origin=(0.700293878, -2.26, 3.033333333), z_dir=(0, 1, 0)), keep=Keep.TOP, mode=Mode.PRIVATE)
    add(chamfer_1_piece_26, mode=Mode.SUBTRACT)
    with BuildSketch(Plane(origin=(0.7, -14.866639232, 5.33), x_dir=(0.9776715712462587, 0, 0.2101387607674309), z_dir=(0, 1, 0))) as chamfer_1_piece_27_section:
        Polygon((CHAMFER_1_SIZE_2 * 0.977671570353, CHAMFER_1_SIZE_2 * 0.210138760575), (-CHAMFER_1_SIZE * 0.210138760767, CHAMFER_1_SIZE * 0.977671571246), (0, 0), align=None)
    chamfer_1_piece_27 = extrude(amount=22.113278464, mode=Mode.PRIVATE)
    chamfer_1_piece_27 = split(chamfer_1_piece_27, bisect_by=Plane(origin=(0.700293878, 0.28, 3.033333333), z_dir=(0, 1, 0)), keep=Keep.TOP, mode=Mode.PRIVATE)
    add(chamfer_1_piece_27, mode=Mode.SUBTRACT)

    # Эскиз6 → Вырез-Вытянуть1 (cut)
    with BuildSketch(Plane.XY.offset(5.33)):
        with Locations((4.25, 0.864447944)):
            Circle(SKETCH_6_R)
    extrude(amount=-CUT_EXTRUDE_1_DEPTH, mode=Mode.SUBTRACT)

    # Эскиз7 → Вырез-Вытянуть2 (cut)
    with BuildSketch(Plane.XY.offset(5.33)):
        with Locations((4.103600287, -8.176143791)):
            Rectangle(SKETCH_7_W, SKETCH_7_H)
    extrude(amount=-CUT_EXTRUDE_2_DEPTH, mode=Mode.SUBTRACT)

    # Фаска2
    chamfer_2_edges = [part.edges().sort_by_distance(p)[0] for p in [
        (4.25, -6.35, 0.38),
        (4.25, -6.35, 5.33),
    ]]
    chamfer_2_side = [part.faces().sort_by_distance(p)[0] for p in [
        (4.25, -6.35, 2.855),
    ]]
    chamfer(chamfer_2_edges, length=CHAMFER_2_SIZE, length2=CHAMFER_2_SIZE2, reference=chamfer_2_side[0])


solid = part.part
